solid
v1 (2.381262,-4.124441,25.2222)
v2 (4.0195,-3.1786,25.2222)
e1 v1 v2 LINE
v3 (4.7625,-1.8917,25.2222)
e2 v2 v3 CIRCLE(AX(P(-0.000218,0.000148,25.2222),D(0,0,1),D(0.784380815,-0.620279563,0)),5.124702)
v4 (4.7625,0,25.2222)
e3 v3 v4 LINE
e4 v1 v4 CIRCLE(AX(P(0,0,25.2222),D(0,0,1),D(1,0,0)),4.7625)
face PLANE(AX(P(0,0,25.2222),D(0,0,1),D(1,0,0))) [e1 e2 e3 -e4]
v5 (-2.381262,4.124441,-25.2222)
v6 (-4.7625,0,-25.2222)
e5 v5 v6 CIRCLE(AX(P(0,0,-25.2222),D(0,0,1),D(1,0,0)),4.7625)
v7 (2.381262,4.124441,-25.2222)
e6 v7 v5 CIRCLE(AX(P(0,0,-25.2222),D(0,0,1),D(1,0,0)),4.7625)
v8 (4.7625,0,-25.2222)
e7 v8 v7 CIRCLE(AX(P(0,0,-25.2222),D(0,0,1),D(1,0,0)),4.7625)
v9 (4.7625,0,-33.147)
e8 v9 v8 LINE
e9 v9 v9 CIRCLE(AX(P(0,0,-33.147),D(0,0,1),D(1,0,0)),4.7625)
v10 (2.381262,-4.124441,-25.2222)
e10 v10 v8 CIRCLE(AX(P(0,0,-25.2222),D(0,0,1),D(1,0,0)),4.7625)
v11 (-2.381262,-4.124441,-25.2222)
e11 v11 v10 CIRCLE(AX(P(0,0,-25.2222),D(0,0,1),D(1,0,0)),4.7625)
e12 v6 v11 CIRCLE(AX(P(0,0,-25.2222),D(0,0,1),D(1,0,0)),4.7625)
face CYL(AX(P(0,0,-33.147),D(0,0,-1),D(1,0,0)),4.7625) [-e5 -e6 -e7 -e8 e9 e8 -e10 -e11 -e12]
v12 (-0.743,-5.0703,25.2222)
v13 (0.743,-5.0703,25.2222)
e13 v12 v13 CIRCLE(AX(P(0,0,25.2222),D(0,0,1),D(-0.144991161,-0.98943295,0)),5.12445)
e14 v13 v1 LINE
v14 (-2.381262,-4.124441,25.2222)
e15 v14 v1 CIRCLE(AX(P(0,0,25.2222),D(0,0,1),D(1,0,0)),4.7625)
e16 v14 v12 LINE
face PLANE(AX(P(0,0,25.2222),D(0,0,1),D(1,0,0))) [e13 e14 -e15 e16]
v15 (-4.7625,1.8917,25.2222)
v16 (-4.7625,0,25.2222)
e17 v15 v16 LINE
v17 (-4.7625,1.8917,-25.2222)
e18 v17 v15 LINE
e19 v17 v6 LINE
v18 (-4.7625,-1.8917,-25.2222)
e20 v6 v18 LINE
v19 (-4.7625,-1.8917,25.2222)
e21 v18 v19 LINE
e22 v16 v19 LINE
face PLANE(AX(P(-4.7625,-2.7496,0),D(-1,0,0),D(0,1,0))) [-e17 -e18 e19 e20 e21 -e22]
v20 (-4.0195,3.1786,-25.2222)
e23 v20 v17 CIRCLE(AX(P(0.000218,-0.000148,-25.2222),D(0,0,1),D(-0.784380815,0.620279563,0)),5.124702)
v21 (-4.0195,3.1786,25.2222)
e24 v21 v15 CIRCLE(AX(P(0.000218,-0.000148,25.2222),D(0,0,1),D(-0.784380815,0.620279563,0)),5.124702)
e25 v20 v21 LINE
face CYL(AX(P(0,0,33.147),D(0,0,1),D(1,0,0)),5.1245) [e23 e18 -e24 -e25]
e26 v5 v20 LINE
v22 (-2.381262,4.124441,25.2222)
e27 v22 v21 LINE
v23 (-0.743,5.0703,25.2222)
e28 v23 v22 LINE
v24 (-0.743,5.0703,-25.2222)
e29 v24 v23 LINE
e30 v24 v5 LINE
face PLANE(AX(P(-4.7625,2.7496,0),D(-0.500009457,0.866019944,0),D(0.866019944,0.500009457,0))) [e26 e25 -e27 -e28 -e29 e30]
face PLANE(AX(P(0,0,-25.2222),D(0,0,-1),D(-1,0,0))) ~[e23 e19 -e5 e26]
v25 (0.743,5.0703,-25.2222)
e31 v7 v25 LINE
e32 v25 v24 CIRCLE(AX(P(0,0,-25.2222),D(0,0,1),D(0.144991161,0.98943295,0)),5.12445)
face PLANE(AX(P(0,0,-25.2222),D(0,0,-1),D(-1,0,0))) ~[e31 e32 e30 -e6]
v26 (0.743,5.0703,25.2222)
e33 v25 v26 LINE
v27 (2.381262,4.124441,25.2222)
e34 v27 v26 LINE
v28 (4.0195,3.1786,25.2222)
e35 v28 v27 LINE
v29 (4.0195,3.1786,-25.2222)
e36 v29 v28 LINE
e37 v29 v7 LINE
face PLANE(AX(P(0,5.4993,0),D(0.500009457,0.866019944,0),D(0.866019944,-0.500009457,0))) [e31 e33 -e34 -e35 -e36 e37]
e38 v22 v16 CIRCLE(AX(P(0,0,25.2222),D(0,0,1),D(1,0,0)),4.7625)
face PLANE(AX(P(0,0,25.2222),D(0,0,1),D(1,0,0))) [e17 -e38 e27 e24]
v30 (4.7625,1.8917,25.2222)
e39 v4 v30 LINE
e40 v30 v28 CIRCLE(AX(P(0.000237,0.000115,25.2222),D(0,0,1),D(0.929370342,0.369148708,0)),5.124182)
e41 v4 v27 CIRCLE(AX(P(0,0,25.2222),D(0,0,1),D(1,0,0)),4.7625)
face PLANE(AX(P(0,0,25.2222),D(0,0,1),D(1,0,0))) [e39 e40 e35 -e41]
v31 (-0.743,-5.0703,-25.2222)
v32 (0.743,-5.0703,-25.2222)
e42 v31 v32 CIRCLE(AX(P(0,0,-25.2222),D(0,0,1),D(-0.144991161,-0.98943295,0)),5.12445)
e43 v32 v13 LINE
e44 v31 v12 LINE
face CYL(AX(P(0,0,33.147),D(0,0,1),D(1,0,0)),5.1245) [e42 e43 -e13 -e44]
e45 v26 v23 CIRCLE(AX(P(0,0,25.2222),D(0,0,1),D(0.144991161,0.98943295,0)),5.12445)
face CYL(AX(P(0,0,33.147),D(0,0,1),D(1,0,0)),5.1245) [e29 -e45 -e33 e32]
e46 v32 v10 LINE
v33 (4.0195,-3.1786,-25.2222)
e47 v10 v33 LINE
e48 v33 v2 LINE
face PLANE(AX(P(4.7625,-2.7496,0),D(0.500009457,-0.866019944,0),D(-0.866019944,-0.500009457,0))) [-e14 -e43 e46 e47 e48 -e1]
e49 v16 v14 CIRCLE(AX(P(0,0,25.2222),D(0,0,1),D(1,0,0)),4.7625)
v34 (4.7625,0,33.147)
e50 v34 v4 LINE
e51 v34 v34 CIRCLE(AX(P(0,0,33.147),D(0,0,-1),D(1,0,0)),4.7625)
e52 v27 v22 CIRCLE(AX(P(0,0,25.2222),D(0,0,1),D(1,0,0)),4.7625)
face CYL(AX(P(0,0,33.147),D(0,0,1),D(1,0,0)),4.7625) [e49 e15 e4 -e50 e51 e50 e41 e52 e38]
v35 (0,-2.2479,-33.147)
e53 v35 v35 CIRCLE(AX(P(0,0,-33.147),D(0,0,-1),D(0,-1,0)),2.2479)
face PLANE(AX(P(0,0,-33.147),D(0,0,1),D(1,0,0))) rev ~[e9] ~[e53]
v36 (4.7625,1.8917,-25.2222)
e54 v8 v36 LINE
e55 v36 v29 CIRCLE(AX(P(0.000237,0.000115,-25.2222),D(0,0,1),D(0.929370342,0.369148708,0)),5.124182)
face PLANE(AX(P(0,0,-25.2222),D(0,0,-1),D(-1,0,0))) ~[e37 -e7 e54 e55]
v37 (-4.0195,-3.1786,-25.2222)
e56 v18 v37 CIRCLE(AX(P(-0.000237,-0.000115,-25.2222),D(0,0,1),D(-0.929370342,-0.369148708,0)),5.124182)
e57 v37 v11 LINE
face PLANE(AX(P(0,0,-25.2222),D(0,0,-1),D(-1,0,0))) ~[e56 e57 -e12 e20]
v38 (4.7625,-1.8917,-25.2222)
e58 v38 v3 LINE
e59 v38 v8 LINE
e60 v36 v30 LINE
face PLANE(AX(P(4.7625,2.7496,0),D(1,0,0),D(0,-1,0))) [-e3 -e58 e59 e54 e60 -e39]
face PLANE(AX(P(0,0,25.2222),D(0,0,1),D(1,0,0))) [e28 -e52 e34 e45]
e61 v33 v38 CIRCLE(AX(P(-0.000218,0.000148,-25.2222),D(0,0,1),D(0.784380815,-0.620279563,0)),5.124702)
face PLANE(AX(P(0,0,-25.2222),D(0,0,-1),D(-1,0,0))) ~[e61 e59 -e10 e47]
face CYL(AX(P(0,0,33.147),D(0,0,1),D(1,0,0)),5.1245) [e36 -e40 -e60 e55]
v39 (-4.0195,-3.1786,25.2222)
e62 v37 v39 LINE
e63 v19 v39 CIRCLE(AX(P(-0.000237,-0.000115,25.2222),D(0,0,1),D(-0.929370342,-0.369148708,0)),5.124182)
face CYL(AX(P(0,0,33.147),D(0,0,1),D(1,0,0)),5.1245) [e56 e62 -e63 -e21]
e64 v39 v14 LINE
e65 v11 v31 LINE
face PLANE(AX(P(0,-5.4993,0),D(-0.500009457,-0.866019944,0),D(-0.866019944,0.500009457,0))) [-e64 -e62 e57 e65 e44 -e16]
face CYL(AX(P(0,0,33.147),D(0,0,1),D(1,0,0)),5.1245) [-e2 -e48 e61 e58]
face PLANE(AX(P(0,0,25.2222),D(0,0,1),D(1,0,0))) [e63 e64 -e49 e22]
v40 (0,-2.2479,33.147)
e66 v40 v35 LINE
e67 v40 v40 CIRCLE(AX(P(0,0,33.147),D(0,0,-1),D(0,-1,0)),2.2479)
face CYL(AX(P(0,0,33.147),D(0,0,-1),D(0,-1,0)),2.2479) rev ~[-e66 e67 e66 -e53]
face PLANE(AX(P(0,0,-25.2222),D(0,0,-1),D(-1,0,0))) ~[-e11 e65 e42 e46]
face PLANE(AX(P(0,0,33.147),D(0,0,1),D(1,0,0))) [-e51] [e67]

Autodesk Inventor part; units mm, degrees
ref_plane "YZ Plane" through (0, 0, 0) normal (1, 0, 0) x (0, 1, 0)
ref_plane "XZ Plane" through (0, 0, 0) normal (0, 1, 0) x (-1, 0, 0)
ref_plane "XY Plane" through (0, 0, 0) normal (0, 0, 1) x (1, 0, 0)
sketch "Sketch1" plane through (0, 0, 0) normal (0, 0, 1) x (1, 0, 0)
  line L0 (-4.7625, -2.7496) -> (-4.7625, 2.7496)
  line L1 (-4.7625, 2.7496) -> (0, 5.4993)
  line L2 (0, 5.4993) -> (4.7625, 2.7496)
  line L3 (4.7625, 2.7496) -> (4.7625, -2.7496)
  line L4 (4.7625, -2.7496) -> (0, -5.4993)
  line L5 (0, -5.4993) -> (-4.7625, -2.7496)
  point P0 (0, 0)
  point P1 (0, 0)
  dimension "Size" = 9.525
extrude "Extrusion1" add sketch "Sketch1" along normal mid plane 66.294
sketch "Sketch3" plane through (0, 0, 33.147) normal (0, 0, 1) x (1, 0, 0)
  line L0 (-4.7625, 2.7496) -> (0, 5.4993) construction
  line L1 (0, 5.4993) -> (4.7625, 2.7496) construction
  line L2 (4.7625, 2.7496) -> (4.7625, -2.7496) construction
  line L3 (4.7625, -2.7496) -> (0, -5.4993) construction
  line L4 (0, -5.4993) -> (-4.7625, -2.7496) construction
  line L5 (-4.7625, -2.7496) -> (-4.7625, 2.7496) construction
  point P0 (0, 0)
hole "Hole1" at (0, 0, 33.147) direction (0, 0, -1) diameter 4.4958 end through all
sketch "Sketch4" plane through (0, 0, 33.147) normal (0, 0, 1) x (1, 0, 0)
  circle A0 centre (0, 0) radius 2.2479 construction
  line L0 (-4.7625, 2.7496) -> (0, 5.4993) construction
  line L1 (0, 5.4993) -> (4.7625, 2.7496) construction
  line L2 (4.7625, 2.7496) -> (4.7625, -2.7496) construction
  line L3 (4.7625, -2.7496) -> (0, -5.4993) construction
  line L4 (0, -5.4993) -> (-4.7625, -2.7496) construction
  line L5 (-4.7625, -2.7496) -> (-4.7625, 2.7496) construction
  circle A1 centre (0, 0) radius 5.1245
  circle A2 centre (0, 0) radius 8.89
  dimension "thunder" = 10.2489
  dimension "d16" = 17.78
extrude "Extrusion3" cut sketch "Sketch4" against normal through all
sketch "Sketch5" plane through (0, 0, 33.147) normal (0, 0, 1) x (1, 0, 0)
  circle A0 centre (0, 0) radius 2.2479 projected
  circle A1 centre (0, 0) radius 4.7625
  line L0 (4.7625, -1.8917) -> (4.7625, 1.8917) projected
  line L1 (4.0195, 3.1786) -> (0.743, 5.0703) projected
  line L2 (-0.743, 5.0703) -> (-4.0195, 3.1786) projected
  line L3 (-4.7625, 1.8917) -> (-4.7625, -1.8917) projected
  line L4 (-4.0195, -3.1786) -> (-0.743, -5.0703) projected
  line L5 (0.743, -5.0703) -> (4.0195, -3.1786) projected
  circle A2 centre (0, 0) radius 2.2479 projected
  arc A3 (4.0195, -3.1786) -> (4.7625, -1.8917) centre (0, 0) ccw projected
  arc A4 (4.7625, 1.8917) -> (4.0195, 3.1786) centre (0, 0) ccw projected
  arc A5 (0.743, 5.0703) -> (-0.743, 5.0703) centre (0, 0) ccw projected
  arc A6 (-4.0195, 3.1786) -> (-4.7625, 1.8917) centre (0, 0) ccw projected
  arc A7 (-4.7625, -1.8917) -> (-4.0195, -3.1786) centre (0, 0) ccw projected
  arc A8 (-0.743, -5.0703) -> (0.743, -5.0703) centre (0, 0) ccw projected
  point P0 (2.3813, -4.1244)
  point P1 (-2.3813, -4.1244)
  point P2 (-4.7625, 0)
  point P3 (-2.3813, 4.1244)
  point P4 (2.3812, 4.1244)
  point P5 (4.7625, 0)
  dimension "d21" = 9.525
extrude "Extrusion4" cut sketch "Sketch5" against normal blind 7.9248 contours L0 A3 L5 A1 | A1 L1 A4 L0 | A1 L2 A5 L1 | L5 A8 L4 A1 | A1 L3 A6 L2 | L4 A7 L3 A1
mirror "Mirror2" about plane through (0, 0, 0) normal (0, 0, 1) of "Extrusion4"
equation "\"bearing\" = 25.4"
properties part number "GP9-008" material "Aluminum 6061"
